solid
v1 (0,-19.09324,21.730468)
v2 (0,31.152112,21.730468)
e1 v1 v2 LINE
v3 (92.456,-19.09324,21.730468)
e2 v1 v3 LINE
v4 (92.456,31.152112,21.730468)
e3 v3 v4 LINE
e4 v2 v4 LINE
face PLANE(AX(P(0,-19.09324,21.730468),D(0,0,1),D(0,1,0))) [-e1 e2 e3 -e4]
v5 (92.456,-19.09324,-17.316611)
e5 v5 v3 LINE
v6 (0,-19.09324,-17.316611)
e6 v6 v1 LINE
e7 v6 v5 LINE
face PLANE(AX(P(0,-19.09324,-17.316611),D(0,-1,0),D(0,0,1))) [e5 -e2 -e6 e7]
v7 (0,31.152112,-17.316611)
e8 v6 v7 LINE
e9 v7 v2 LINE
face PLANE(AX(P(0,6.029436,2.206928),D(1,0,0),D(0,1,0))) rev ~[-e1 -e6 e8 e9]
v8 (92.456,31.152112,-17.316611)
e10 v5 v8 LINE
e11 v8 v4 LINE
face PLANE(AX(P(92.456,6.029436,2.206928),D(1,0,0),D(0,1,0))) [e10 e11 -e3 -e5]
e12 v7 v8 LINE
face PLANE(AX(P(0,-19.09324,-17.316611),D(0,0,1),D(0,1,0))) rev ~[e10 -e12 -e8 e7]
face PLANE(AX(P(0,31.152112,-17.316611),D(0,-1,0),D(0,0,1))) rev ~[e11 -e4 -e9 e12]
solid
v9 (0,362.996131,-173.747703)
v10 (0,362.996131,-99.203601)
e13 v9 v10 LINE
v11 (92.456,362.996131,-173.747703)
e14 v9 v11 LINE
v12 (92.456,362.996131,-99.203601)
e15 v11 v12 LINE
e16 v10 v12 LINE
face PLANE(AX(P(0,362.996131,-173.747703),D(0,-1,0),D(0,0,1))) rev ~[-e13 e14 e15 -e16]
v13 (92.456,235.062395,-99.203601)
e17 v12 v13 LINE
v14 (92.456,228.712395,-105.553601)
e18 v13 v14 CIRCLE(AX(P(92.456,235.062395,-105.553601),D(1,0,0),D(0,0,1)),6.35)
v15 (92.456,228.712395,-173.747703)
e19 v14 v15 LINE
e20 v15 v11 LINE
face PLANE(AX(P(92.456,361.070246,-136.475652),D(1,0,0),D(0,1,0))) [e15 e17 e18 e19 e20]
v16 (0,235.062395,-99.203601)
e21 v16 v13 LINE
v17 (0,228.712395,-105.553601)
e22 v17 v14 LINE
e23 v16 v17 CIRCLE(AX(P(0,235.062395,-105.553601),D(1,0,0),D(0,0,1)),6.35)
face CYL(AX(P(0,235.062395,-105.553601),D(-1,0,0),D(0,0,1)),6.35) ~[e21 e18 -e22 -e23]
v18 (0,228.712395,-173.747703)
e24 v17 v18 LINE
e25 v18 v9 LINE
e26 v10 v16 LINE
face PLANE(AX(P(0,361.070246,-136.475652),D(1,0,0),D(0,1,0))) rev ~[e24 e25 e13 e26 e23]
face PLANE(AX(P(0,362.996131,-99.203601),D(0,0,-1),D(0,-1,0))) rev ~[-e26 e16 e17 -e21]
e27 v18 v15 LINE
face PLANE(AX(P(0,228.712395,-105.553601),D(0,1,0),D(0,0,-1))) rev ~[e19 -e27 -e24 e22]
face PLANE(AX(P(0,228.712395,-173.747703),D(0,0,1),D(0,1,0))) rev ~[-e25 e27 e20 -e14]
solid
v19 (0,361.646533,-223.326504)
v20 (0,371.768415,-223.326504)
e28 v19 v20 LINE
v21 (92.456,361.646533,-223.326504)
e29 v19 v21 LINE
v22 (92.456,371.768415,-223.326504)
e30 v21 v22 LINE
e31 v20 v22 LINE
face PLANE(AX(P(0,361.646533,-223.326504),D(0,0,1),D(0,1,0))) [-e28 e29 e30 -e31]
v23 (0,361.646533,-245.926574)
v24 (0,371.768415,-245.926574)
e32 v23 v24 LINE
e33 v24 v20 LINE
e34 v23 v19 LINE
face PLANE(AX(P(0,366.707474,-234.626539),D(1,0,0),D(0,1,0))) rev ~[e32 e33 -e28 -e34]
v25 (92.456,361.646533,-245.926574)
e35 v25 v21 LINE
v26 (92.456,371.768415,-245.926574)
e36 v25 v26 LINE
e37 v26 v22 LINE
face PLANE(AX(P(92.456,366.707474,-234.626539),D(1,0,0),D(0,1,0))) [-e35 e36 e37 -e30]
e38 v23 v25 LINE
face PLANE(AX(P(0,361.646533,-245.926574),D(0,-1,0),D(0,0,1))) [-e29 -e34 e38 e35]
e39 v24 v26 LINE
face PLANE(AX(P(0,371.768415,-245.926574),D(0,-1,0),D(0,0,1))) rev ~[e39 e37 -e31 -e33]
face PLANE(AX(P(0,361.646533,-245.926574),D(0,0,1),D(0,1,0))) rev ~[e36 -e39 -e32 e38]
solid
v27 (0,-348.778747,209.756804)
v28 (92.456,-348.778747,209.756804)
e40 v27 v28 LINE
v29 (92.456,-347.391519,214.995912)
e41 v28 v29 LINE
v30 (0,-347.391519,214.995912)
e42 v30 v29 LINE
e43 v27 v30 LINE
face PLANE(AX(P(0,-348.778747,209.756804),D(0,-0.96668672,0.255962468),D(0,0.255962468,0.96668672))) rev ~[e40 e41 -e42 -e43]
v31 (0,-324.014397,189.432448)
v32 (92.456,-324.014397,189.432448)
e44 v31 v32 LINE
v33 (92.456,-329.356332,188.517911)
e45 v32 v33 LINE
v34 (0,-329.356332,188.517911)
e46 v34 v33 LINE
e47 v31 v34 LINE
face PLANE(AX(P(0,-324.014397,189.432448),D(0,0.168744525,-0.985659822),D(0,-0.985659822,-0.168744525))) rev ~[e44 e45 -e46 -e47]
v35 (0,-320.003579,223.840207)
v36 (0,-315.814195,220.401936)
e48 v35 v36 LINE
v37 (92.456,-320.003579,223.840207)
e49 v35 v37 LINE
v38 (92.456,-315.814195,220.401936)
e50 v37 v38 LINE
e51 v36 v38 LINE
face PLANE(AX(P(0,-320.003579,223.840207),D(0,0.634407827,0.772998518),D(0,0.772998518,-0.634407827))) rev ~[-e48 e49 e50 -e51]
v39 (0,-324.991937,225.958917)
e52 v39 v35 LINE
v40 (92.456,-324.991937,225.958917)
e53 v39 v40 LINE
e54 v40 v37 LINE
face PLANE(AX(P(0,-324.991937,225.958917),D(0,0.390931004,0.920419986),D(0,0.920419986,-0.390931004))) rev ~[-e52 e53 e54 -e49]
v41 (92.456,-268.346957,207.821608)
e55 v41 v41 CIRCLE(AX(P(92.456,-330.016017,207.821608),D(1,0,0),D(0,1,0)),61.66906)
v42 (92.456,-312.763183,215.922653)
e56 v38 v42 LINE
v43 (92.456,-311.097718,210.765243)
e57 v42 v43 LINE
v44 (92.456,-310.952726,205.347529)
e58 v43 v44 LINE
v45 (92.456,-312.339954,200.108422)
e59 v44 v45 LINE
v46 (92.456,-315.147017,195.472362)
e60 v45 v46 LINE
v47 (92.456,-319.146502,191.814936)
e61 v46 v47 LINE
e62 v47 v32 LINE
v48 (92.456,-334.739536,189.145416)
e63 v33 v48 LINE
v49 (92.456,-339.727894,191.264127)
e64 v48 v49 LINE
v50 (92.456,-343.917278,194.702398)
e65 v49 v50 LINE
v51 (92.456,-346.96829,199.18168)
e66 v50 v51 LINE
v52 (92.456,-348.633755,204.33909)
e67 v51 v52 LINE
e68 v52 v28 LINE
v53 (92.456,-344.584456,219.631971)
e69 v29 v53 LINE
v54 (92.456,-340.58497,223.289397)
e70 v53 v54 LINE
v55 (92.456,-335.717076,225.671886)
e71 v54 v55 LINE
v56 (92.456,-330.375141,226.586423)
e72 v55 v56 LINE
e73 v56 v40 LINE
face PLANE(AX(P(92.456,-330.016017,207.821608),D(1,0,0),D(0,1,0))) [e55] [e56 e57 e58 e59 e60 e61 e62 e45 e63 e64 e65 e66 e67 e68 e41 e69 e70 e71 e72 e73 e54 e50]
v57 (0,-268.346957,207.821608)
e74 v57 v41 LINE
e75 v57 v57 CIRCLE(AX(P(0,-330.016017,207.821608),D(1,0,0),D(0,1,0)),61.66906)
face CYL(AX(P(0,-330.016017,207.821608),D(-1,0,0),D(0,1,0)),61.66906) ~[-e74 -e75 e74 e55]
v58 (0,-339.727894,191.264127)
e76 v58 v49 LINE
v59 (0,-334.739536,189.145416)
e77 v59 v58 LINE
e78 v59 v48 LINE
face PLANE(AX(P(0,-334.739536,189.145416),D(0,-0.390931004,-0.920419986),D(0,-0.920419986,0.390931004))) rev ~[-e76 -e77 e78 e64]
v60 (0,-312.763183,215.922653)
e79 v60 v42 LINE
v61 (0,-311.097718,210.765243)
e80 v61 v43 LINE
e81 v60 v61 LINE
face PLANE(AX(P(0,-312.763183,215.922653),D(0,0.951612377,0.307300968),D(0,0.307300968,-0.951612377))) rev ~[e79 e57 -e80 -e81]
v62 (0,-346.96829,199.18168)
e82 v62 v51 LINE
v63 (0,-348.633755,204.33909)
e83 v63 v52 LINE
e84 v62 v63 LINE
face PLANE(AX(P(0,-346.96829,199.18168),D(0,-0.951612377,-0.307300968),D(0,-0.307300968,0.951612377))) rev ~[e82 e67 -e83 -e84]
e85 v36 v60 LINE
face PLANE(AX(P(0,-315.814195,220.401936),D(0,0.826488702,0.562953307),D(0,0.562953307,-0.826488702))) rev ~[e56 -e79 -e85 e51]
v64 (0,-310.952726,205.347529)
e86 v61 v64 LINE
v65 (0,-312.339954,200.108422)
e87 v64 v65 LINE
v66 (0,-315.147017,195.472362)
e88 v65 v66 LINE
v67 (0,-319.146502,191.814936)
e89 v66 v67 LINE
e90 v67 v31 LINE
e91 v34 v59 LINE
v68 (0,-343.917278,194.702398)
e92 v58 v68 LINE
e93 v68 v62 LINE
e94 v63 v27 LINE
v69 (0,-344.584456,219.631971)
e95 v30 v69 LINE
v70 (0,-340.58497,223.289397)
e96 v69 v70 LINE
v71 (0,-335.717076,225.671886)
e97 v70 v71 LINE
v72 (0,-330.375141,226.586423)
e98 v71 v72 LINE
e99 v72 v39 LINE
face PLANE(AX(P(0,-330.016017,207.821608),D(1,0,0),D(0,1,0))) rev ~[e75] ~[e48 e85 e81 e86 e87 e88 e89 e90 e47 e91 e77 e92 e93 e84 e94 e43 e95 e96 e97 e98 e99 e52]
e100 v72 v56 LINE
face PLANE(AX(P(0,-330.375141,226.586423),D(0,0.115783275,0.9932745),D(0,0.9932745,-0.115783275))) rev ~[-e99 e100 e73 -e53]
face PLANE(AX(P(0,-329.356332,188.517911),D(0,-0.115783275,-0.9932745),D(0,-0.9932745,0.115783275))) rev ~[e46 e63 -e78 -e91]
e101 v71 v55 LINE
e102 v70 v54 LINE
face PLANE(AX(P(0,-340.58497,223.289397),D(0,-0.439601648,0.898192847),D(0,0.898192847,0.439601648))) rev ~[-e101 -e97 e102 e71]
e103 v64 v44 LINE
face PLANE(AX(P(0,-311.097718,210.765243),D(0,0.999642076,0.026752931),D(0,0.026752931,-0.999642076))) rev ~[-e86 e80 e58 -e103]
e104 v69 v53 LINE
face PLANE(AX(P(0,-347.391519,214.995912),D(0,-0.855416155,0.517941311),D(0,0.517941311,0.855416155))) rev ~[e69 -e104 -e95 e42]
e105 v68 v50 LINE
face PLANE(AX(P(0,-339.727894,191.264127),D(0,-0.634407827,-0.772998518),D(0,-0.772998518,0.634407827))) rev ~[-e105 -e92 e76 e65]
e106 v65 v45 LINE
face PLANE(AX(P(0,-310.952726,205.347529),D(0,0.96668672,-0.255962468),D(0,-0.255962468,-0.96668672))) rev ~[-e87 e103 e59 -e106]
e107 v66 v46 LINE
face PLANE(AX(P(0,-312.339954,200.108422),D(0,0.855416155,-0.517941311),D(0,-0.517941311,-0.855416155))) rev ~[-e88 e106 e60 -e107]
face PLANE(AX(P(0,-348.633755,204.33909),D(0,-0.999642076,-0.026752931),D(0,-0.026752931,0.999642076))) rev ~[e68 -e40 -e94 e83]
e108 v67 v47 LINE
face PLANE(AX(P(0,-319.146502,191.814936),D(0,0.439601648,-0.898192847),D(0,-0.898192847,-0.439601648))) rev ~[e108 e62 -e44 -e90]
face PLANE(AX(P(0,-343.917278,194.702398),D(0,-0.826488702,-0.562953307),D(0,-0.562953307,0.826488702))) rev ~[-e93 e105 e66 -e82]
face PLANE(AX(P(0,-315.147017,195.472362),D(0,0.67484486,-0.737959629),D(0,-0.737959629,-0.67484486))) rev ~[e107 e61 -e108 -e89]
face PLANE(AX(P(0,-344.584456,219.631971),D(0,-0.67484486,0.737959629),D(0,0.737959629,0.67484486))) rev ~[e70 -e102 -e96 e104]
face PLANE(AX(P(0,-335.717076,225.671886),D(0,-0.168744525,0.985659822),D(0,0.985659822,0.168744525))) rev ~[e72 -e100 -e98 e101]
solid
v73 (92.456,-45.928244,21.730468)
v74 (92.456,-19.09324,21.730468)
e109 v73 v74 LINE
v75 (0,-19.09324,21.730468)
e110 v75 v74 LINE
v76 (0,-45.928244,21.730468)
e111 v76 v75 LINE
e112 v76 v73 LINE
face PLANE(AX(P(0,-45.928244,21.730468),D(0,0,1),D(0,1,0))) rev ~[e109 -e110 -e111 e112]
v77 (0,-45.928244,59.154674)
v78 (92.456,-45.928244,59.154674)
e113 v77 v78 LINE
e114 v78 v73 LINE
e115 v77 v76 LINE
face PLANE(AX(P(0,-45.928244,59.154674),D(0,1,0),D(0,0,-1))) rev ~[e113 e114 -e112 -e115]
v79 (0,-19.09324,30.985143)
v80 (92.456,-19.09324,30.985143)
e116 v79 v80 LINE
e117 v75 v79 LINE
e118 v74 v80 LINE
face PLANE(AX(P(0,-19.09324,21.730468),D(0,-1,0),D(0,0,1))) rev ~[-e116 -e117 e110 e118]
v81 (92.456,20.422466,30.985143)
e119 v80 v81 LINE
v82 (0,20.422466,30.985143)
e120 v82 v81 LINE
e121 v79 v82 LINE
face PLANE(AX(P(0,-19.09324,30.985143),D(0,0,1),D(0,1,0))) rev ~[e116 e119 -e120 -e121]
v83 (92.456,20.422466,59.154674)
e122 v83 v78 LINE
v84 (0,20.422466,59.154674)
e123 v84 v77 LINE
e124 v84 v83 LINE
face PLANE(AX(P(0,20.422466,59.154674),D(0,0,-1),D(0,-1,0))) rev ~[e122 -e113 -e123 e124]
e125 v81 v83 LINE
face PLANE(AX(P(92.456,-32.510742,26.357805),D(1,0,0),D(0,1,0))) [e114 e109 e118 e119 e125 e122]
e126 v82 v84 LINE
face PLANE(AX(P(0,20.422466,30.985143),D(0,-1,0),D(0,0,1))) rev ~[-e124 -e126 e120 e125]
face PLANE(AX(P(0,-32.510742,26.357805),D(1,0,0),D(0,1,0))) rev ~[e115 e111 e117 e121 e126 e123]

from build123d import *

# Parameters (mm, degrees)
F0_W     = 50.2453520894
F0_H     = 39.0470791608
F1_DEPTH = 92.456
F0_W_2   = 26.8350038677
F0_H_2   = 9.2546753585
F0_W_3   = 39.5157057792
F0_H_3   = 28.1695313752
F0_W_4   = 3.8517713547
F0_H_4   = 74.5441019535
F0_W_5   = 10.1218819618
F0_H_5   = 22.6000696421
F0_R     = 61.6690599932


with BuildPart() as f1:
    # F0 (on Right) → F1 (new body)
    with BuildSketch(Plane.YZ):
        with Locations((6.0294363648, 2.2069280967)):
            Rectangle(F0_W, F0_H)
    extrude(amount=F1_DEPTH)


with BuildPart() as f1b:
    # F0 (on Right) → F1, piece 2 (new body)
    with BuildSketch(Plane.YZ):
        with Locations((-32.5107416138, 26.3578053564)):
            Rectangle(F0_W_2, F0_H_2)
        with Locations((0.6646132097, 45.0699087232)):
            Rectangle(F0_W_3, F0_H_3)
        with Locations((-32.5107416138, 45.0699087232)):
            Rectangle(F0_W_2, F0_H_3)
    extrude(amount=F1_DEPTH)


with BuildPart() as f1c:
    # F0 (on Right) → F1, piece 3 (new body)
    with BuildSketch(Plane.YZ):
        with Locations((361.0702455044, -136.4756524563)):
            Rectangle(F0_W_4, F0_H_4)
        with BuildLine():
            Line((228.7123948336, -173.747703433), (359.144359827, -173.747703433))
            Line((359.144359827, -173.747703433), (359.144359827, -99.2036014795))
            Line((359.144359827, -99.2036014795), (235.0623948336, -99.2036014795))
            ThreePointArc((235.0623948336, -99.2036014795), (230.572266773, -101.063473419), (228.7123948336, -105.5536014795))
            Line((228.7123948336, -105.5536014795), (228.7123948336, -173.747703433))
        make_face()
    extrude(amount=F1_DEPTH)


with BuildPart() as f1d:
    # F0 (on Right) → F1, piece 4 (new body)
    with BuildSketch(Plane.YZ):
        with Locations((366.7074739933, -234.6265390515)):
            Rectangle(F0_W_5, F0_H_5)
    extrude(amount=F1_DEPTH)


with BuildPart() as f1e:
    # F0 (on Right) → F1, piece 5 (new body)
    with BuildSketch(Plane.YZ):
        with Locations((-330.0160169601, 207.8216075897)):
            Circle(F0_R)
        Polygon((-348.6337553052, 204.3390901534), (-348.7787469344, 209.7568042641), (-347.3915189352, 214.9959117489), (-344.5844562699, 219.6319712773), (-340.5849704614, 223.2893968782), (-335.7170760642, 225.671885681), (-330.3751409316, 226.5864226119), (-324.9919368786, 225.9589173279), (-320.0035790823, 223.8402065751), (-315.8141946244, 220.4019356983), (-312.7631825185, 215.9226529557), (-311.0977176204, 210.7652431959), (-310.9527259912, 205.3475290851), (-312.3399539904, 200.1084216004), (-315.1470166557, 195.4723620719), (-319.1465024641, 191.814936471), (-324.0143968614, 189.4324476683), (-329.3563319939, 188.5179107373), (-334.739536047, 189.1454160213), (-339.7278938433, 191.2641267741), (-343.9172783012, 194.7023976509), (-346.9682904071, 199.1816803935), align=None, mode=Mode.SUBTRACT)
    extrude(amount=F1_DEPTH)


solid = Compound([f1.part, f1b.part, f1c.part, f1d.part, f1e.part])
